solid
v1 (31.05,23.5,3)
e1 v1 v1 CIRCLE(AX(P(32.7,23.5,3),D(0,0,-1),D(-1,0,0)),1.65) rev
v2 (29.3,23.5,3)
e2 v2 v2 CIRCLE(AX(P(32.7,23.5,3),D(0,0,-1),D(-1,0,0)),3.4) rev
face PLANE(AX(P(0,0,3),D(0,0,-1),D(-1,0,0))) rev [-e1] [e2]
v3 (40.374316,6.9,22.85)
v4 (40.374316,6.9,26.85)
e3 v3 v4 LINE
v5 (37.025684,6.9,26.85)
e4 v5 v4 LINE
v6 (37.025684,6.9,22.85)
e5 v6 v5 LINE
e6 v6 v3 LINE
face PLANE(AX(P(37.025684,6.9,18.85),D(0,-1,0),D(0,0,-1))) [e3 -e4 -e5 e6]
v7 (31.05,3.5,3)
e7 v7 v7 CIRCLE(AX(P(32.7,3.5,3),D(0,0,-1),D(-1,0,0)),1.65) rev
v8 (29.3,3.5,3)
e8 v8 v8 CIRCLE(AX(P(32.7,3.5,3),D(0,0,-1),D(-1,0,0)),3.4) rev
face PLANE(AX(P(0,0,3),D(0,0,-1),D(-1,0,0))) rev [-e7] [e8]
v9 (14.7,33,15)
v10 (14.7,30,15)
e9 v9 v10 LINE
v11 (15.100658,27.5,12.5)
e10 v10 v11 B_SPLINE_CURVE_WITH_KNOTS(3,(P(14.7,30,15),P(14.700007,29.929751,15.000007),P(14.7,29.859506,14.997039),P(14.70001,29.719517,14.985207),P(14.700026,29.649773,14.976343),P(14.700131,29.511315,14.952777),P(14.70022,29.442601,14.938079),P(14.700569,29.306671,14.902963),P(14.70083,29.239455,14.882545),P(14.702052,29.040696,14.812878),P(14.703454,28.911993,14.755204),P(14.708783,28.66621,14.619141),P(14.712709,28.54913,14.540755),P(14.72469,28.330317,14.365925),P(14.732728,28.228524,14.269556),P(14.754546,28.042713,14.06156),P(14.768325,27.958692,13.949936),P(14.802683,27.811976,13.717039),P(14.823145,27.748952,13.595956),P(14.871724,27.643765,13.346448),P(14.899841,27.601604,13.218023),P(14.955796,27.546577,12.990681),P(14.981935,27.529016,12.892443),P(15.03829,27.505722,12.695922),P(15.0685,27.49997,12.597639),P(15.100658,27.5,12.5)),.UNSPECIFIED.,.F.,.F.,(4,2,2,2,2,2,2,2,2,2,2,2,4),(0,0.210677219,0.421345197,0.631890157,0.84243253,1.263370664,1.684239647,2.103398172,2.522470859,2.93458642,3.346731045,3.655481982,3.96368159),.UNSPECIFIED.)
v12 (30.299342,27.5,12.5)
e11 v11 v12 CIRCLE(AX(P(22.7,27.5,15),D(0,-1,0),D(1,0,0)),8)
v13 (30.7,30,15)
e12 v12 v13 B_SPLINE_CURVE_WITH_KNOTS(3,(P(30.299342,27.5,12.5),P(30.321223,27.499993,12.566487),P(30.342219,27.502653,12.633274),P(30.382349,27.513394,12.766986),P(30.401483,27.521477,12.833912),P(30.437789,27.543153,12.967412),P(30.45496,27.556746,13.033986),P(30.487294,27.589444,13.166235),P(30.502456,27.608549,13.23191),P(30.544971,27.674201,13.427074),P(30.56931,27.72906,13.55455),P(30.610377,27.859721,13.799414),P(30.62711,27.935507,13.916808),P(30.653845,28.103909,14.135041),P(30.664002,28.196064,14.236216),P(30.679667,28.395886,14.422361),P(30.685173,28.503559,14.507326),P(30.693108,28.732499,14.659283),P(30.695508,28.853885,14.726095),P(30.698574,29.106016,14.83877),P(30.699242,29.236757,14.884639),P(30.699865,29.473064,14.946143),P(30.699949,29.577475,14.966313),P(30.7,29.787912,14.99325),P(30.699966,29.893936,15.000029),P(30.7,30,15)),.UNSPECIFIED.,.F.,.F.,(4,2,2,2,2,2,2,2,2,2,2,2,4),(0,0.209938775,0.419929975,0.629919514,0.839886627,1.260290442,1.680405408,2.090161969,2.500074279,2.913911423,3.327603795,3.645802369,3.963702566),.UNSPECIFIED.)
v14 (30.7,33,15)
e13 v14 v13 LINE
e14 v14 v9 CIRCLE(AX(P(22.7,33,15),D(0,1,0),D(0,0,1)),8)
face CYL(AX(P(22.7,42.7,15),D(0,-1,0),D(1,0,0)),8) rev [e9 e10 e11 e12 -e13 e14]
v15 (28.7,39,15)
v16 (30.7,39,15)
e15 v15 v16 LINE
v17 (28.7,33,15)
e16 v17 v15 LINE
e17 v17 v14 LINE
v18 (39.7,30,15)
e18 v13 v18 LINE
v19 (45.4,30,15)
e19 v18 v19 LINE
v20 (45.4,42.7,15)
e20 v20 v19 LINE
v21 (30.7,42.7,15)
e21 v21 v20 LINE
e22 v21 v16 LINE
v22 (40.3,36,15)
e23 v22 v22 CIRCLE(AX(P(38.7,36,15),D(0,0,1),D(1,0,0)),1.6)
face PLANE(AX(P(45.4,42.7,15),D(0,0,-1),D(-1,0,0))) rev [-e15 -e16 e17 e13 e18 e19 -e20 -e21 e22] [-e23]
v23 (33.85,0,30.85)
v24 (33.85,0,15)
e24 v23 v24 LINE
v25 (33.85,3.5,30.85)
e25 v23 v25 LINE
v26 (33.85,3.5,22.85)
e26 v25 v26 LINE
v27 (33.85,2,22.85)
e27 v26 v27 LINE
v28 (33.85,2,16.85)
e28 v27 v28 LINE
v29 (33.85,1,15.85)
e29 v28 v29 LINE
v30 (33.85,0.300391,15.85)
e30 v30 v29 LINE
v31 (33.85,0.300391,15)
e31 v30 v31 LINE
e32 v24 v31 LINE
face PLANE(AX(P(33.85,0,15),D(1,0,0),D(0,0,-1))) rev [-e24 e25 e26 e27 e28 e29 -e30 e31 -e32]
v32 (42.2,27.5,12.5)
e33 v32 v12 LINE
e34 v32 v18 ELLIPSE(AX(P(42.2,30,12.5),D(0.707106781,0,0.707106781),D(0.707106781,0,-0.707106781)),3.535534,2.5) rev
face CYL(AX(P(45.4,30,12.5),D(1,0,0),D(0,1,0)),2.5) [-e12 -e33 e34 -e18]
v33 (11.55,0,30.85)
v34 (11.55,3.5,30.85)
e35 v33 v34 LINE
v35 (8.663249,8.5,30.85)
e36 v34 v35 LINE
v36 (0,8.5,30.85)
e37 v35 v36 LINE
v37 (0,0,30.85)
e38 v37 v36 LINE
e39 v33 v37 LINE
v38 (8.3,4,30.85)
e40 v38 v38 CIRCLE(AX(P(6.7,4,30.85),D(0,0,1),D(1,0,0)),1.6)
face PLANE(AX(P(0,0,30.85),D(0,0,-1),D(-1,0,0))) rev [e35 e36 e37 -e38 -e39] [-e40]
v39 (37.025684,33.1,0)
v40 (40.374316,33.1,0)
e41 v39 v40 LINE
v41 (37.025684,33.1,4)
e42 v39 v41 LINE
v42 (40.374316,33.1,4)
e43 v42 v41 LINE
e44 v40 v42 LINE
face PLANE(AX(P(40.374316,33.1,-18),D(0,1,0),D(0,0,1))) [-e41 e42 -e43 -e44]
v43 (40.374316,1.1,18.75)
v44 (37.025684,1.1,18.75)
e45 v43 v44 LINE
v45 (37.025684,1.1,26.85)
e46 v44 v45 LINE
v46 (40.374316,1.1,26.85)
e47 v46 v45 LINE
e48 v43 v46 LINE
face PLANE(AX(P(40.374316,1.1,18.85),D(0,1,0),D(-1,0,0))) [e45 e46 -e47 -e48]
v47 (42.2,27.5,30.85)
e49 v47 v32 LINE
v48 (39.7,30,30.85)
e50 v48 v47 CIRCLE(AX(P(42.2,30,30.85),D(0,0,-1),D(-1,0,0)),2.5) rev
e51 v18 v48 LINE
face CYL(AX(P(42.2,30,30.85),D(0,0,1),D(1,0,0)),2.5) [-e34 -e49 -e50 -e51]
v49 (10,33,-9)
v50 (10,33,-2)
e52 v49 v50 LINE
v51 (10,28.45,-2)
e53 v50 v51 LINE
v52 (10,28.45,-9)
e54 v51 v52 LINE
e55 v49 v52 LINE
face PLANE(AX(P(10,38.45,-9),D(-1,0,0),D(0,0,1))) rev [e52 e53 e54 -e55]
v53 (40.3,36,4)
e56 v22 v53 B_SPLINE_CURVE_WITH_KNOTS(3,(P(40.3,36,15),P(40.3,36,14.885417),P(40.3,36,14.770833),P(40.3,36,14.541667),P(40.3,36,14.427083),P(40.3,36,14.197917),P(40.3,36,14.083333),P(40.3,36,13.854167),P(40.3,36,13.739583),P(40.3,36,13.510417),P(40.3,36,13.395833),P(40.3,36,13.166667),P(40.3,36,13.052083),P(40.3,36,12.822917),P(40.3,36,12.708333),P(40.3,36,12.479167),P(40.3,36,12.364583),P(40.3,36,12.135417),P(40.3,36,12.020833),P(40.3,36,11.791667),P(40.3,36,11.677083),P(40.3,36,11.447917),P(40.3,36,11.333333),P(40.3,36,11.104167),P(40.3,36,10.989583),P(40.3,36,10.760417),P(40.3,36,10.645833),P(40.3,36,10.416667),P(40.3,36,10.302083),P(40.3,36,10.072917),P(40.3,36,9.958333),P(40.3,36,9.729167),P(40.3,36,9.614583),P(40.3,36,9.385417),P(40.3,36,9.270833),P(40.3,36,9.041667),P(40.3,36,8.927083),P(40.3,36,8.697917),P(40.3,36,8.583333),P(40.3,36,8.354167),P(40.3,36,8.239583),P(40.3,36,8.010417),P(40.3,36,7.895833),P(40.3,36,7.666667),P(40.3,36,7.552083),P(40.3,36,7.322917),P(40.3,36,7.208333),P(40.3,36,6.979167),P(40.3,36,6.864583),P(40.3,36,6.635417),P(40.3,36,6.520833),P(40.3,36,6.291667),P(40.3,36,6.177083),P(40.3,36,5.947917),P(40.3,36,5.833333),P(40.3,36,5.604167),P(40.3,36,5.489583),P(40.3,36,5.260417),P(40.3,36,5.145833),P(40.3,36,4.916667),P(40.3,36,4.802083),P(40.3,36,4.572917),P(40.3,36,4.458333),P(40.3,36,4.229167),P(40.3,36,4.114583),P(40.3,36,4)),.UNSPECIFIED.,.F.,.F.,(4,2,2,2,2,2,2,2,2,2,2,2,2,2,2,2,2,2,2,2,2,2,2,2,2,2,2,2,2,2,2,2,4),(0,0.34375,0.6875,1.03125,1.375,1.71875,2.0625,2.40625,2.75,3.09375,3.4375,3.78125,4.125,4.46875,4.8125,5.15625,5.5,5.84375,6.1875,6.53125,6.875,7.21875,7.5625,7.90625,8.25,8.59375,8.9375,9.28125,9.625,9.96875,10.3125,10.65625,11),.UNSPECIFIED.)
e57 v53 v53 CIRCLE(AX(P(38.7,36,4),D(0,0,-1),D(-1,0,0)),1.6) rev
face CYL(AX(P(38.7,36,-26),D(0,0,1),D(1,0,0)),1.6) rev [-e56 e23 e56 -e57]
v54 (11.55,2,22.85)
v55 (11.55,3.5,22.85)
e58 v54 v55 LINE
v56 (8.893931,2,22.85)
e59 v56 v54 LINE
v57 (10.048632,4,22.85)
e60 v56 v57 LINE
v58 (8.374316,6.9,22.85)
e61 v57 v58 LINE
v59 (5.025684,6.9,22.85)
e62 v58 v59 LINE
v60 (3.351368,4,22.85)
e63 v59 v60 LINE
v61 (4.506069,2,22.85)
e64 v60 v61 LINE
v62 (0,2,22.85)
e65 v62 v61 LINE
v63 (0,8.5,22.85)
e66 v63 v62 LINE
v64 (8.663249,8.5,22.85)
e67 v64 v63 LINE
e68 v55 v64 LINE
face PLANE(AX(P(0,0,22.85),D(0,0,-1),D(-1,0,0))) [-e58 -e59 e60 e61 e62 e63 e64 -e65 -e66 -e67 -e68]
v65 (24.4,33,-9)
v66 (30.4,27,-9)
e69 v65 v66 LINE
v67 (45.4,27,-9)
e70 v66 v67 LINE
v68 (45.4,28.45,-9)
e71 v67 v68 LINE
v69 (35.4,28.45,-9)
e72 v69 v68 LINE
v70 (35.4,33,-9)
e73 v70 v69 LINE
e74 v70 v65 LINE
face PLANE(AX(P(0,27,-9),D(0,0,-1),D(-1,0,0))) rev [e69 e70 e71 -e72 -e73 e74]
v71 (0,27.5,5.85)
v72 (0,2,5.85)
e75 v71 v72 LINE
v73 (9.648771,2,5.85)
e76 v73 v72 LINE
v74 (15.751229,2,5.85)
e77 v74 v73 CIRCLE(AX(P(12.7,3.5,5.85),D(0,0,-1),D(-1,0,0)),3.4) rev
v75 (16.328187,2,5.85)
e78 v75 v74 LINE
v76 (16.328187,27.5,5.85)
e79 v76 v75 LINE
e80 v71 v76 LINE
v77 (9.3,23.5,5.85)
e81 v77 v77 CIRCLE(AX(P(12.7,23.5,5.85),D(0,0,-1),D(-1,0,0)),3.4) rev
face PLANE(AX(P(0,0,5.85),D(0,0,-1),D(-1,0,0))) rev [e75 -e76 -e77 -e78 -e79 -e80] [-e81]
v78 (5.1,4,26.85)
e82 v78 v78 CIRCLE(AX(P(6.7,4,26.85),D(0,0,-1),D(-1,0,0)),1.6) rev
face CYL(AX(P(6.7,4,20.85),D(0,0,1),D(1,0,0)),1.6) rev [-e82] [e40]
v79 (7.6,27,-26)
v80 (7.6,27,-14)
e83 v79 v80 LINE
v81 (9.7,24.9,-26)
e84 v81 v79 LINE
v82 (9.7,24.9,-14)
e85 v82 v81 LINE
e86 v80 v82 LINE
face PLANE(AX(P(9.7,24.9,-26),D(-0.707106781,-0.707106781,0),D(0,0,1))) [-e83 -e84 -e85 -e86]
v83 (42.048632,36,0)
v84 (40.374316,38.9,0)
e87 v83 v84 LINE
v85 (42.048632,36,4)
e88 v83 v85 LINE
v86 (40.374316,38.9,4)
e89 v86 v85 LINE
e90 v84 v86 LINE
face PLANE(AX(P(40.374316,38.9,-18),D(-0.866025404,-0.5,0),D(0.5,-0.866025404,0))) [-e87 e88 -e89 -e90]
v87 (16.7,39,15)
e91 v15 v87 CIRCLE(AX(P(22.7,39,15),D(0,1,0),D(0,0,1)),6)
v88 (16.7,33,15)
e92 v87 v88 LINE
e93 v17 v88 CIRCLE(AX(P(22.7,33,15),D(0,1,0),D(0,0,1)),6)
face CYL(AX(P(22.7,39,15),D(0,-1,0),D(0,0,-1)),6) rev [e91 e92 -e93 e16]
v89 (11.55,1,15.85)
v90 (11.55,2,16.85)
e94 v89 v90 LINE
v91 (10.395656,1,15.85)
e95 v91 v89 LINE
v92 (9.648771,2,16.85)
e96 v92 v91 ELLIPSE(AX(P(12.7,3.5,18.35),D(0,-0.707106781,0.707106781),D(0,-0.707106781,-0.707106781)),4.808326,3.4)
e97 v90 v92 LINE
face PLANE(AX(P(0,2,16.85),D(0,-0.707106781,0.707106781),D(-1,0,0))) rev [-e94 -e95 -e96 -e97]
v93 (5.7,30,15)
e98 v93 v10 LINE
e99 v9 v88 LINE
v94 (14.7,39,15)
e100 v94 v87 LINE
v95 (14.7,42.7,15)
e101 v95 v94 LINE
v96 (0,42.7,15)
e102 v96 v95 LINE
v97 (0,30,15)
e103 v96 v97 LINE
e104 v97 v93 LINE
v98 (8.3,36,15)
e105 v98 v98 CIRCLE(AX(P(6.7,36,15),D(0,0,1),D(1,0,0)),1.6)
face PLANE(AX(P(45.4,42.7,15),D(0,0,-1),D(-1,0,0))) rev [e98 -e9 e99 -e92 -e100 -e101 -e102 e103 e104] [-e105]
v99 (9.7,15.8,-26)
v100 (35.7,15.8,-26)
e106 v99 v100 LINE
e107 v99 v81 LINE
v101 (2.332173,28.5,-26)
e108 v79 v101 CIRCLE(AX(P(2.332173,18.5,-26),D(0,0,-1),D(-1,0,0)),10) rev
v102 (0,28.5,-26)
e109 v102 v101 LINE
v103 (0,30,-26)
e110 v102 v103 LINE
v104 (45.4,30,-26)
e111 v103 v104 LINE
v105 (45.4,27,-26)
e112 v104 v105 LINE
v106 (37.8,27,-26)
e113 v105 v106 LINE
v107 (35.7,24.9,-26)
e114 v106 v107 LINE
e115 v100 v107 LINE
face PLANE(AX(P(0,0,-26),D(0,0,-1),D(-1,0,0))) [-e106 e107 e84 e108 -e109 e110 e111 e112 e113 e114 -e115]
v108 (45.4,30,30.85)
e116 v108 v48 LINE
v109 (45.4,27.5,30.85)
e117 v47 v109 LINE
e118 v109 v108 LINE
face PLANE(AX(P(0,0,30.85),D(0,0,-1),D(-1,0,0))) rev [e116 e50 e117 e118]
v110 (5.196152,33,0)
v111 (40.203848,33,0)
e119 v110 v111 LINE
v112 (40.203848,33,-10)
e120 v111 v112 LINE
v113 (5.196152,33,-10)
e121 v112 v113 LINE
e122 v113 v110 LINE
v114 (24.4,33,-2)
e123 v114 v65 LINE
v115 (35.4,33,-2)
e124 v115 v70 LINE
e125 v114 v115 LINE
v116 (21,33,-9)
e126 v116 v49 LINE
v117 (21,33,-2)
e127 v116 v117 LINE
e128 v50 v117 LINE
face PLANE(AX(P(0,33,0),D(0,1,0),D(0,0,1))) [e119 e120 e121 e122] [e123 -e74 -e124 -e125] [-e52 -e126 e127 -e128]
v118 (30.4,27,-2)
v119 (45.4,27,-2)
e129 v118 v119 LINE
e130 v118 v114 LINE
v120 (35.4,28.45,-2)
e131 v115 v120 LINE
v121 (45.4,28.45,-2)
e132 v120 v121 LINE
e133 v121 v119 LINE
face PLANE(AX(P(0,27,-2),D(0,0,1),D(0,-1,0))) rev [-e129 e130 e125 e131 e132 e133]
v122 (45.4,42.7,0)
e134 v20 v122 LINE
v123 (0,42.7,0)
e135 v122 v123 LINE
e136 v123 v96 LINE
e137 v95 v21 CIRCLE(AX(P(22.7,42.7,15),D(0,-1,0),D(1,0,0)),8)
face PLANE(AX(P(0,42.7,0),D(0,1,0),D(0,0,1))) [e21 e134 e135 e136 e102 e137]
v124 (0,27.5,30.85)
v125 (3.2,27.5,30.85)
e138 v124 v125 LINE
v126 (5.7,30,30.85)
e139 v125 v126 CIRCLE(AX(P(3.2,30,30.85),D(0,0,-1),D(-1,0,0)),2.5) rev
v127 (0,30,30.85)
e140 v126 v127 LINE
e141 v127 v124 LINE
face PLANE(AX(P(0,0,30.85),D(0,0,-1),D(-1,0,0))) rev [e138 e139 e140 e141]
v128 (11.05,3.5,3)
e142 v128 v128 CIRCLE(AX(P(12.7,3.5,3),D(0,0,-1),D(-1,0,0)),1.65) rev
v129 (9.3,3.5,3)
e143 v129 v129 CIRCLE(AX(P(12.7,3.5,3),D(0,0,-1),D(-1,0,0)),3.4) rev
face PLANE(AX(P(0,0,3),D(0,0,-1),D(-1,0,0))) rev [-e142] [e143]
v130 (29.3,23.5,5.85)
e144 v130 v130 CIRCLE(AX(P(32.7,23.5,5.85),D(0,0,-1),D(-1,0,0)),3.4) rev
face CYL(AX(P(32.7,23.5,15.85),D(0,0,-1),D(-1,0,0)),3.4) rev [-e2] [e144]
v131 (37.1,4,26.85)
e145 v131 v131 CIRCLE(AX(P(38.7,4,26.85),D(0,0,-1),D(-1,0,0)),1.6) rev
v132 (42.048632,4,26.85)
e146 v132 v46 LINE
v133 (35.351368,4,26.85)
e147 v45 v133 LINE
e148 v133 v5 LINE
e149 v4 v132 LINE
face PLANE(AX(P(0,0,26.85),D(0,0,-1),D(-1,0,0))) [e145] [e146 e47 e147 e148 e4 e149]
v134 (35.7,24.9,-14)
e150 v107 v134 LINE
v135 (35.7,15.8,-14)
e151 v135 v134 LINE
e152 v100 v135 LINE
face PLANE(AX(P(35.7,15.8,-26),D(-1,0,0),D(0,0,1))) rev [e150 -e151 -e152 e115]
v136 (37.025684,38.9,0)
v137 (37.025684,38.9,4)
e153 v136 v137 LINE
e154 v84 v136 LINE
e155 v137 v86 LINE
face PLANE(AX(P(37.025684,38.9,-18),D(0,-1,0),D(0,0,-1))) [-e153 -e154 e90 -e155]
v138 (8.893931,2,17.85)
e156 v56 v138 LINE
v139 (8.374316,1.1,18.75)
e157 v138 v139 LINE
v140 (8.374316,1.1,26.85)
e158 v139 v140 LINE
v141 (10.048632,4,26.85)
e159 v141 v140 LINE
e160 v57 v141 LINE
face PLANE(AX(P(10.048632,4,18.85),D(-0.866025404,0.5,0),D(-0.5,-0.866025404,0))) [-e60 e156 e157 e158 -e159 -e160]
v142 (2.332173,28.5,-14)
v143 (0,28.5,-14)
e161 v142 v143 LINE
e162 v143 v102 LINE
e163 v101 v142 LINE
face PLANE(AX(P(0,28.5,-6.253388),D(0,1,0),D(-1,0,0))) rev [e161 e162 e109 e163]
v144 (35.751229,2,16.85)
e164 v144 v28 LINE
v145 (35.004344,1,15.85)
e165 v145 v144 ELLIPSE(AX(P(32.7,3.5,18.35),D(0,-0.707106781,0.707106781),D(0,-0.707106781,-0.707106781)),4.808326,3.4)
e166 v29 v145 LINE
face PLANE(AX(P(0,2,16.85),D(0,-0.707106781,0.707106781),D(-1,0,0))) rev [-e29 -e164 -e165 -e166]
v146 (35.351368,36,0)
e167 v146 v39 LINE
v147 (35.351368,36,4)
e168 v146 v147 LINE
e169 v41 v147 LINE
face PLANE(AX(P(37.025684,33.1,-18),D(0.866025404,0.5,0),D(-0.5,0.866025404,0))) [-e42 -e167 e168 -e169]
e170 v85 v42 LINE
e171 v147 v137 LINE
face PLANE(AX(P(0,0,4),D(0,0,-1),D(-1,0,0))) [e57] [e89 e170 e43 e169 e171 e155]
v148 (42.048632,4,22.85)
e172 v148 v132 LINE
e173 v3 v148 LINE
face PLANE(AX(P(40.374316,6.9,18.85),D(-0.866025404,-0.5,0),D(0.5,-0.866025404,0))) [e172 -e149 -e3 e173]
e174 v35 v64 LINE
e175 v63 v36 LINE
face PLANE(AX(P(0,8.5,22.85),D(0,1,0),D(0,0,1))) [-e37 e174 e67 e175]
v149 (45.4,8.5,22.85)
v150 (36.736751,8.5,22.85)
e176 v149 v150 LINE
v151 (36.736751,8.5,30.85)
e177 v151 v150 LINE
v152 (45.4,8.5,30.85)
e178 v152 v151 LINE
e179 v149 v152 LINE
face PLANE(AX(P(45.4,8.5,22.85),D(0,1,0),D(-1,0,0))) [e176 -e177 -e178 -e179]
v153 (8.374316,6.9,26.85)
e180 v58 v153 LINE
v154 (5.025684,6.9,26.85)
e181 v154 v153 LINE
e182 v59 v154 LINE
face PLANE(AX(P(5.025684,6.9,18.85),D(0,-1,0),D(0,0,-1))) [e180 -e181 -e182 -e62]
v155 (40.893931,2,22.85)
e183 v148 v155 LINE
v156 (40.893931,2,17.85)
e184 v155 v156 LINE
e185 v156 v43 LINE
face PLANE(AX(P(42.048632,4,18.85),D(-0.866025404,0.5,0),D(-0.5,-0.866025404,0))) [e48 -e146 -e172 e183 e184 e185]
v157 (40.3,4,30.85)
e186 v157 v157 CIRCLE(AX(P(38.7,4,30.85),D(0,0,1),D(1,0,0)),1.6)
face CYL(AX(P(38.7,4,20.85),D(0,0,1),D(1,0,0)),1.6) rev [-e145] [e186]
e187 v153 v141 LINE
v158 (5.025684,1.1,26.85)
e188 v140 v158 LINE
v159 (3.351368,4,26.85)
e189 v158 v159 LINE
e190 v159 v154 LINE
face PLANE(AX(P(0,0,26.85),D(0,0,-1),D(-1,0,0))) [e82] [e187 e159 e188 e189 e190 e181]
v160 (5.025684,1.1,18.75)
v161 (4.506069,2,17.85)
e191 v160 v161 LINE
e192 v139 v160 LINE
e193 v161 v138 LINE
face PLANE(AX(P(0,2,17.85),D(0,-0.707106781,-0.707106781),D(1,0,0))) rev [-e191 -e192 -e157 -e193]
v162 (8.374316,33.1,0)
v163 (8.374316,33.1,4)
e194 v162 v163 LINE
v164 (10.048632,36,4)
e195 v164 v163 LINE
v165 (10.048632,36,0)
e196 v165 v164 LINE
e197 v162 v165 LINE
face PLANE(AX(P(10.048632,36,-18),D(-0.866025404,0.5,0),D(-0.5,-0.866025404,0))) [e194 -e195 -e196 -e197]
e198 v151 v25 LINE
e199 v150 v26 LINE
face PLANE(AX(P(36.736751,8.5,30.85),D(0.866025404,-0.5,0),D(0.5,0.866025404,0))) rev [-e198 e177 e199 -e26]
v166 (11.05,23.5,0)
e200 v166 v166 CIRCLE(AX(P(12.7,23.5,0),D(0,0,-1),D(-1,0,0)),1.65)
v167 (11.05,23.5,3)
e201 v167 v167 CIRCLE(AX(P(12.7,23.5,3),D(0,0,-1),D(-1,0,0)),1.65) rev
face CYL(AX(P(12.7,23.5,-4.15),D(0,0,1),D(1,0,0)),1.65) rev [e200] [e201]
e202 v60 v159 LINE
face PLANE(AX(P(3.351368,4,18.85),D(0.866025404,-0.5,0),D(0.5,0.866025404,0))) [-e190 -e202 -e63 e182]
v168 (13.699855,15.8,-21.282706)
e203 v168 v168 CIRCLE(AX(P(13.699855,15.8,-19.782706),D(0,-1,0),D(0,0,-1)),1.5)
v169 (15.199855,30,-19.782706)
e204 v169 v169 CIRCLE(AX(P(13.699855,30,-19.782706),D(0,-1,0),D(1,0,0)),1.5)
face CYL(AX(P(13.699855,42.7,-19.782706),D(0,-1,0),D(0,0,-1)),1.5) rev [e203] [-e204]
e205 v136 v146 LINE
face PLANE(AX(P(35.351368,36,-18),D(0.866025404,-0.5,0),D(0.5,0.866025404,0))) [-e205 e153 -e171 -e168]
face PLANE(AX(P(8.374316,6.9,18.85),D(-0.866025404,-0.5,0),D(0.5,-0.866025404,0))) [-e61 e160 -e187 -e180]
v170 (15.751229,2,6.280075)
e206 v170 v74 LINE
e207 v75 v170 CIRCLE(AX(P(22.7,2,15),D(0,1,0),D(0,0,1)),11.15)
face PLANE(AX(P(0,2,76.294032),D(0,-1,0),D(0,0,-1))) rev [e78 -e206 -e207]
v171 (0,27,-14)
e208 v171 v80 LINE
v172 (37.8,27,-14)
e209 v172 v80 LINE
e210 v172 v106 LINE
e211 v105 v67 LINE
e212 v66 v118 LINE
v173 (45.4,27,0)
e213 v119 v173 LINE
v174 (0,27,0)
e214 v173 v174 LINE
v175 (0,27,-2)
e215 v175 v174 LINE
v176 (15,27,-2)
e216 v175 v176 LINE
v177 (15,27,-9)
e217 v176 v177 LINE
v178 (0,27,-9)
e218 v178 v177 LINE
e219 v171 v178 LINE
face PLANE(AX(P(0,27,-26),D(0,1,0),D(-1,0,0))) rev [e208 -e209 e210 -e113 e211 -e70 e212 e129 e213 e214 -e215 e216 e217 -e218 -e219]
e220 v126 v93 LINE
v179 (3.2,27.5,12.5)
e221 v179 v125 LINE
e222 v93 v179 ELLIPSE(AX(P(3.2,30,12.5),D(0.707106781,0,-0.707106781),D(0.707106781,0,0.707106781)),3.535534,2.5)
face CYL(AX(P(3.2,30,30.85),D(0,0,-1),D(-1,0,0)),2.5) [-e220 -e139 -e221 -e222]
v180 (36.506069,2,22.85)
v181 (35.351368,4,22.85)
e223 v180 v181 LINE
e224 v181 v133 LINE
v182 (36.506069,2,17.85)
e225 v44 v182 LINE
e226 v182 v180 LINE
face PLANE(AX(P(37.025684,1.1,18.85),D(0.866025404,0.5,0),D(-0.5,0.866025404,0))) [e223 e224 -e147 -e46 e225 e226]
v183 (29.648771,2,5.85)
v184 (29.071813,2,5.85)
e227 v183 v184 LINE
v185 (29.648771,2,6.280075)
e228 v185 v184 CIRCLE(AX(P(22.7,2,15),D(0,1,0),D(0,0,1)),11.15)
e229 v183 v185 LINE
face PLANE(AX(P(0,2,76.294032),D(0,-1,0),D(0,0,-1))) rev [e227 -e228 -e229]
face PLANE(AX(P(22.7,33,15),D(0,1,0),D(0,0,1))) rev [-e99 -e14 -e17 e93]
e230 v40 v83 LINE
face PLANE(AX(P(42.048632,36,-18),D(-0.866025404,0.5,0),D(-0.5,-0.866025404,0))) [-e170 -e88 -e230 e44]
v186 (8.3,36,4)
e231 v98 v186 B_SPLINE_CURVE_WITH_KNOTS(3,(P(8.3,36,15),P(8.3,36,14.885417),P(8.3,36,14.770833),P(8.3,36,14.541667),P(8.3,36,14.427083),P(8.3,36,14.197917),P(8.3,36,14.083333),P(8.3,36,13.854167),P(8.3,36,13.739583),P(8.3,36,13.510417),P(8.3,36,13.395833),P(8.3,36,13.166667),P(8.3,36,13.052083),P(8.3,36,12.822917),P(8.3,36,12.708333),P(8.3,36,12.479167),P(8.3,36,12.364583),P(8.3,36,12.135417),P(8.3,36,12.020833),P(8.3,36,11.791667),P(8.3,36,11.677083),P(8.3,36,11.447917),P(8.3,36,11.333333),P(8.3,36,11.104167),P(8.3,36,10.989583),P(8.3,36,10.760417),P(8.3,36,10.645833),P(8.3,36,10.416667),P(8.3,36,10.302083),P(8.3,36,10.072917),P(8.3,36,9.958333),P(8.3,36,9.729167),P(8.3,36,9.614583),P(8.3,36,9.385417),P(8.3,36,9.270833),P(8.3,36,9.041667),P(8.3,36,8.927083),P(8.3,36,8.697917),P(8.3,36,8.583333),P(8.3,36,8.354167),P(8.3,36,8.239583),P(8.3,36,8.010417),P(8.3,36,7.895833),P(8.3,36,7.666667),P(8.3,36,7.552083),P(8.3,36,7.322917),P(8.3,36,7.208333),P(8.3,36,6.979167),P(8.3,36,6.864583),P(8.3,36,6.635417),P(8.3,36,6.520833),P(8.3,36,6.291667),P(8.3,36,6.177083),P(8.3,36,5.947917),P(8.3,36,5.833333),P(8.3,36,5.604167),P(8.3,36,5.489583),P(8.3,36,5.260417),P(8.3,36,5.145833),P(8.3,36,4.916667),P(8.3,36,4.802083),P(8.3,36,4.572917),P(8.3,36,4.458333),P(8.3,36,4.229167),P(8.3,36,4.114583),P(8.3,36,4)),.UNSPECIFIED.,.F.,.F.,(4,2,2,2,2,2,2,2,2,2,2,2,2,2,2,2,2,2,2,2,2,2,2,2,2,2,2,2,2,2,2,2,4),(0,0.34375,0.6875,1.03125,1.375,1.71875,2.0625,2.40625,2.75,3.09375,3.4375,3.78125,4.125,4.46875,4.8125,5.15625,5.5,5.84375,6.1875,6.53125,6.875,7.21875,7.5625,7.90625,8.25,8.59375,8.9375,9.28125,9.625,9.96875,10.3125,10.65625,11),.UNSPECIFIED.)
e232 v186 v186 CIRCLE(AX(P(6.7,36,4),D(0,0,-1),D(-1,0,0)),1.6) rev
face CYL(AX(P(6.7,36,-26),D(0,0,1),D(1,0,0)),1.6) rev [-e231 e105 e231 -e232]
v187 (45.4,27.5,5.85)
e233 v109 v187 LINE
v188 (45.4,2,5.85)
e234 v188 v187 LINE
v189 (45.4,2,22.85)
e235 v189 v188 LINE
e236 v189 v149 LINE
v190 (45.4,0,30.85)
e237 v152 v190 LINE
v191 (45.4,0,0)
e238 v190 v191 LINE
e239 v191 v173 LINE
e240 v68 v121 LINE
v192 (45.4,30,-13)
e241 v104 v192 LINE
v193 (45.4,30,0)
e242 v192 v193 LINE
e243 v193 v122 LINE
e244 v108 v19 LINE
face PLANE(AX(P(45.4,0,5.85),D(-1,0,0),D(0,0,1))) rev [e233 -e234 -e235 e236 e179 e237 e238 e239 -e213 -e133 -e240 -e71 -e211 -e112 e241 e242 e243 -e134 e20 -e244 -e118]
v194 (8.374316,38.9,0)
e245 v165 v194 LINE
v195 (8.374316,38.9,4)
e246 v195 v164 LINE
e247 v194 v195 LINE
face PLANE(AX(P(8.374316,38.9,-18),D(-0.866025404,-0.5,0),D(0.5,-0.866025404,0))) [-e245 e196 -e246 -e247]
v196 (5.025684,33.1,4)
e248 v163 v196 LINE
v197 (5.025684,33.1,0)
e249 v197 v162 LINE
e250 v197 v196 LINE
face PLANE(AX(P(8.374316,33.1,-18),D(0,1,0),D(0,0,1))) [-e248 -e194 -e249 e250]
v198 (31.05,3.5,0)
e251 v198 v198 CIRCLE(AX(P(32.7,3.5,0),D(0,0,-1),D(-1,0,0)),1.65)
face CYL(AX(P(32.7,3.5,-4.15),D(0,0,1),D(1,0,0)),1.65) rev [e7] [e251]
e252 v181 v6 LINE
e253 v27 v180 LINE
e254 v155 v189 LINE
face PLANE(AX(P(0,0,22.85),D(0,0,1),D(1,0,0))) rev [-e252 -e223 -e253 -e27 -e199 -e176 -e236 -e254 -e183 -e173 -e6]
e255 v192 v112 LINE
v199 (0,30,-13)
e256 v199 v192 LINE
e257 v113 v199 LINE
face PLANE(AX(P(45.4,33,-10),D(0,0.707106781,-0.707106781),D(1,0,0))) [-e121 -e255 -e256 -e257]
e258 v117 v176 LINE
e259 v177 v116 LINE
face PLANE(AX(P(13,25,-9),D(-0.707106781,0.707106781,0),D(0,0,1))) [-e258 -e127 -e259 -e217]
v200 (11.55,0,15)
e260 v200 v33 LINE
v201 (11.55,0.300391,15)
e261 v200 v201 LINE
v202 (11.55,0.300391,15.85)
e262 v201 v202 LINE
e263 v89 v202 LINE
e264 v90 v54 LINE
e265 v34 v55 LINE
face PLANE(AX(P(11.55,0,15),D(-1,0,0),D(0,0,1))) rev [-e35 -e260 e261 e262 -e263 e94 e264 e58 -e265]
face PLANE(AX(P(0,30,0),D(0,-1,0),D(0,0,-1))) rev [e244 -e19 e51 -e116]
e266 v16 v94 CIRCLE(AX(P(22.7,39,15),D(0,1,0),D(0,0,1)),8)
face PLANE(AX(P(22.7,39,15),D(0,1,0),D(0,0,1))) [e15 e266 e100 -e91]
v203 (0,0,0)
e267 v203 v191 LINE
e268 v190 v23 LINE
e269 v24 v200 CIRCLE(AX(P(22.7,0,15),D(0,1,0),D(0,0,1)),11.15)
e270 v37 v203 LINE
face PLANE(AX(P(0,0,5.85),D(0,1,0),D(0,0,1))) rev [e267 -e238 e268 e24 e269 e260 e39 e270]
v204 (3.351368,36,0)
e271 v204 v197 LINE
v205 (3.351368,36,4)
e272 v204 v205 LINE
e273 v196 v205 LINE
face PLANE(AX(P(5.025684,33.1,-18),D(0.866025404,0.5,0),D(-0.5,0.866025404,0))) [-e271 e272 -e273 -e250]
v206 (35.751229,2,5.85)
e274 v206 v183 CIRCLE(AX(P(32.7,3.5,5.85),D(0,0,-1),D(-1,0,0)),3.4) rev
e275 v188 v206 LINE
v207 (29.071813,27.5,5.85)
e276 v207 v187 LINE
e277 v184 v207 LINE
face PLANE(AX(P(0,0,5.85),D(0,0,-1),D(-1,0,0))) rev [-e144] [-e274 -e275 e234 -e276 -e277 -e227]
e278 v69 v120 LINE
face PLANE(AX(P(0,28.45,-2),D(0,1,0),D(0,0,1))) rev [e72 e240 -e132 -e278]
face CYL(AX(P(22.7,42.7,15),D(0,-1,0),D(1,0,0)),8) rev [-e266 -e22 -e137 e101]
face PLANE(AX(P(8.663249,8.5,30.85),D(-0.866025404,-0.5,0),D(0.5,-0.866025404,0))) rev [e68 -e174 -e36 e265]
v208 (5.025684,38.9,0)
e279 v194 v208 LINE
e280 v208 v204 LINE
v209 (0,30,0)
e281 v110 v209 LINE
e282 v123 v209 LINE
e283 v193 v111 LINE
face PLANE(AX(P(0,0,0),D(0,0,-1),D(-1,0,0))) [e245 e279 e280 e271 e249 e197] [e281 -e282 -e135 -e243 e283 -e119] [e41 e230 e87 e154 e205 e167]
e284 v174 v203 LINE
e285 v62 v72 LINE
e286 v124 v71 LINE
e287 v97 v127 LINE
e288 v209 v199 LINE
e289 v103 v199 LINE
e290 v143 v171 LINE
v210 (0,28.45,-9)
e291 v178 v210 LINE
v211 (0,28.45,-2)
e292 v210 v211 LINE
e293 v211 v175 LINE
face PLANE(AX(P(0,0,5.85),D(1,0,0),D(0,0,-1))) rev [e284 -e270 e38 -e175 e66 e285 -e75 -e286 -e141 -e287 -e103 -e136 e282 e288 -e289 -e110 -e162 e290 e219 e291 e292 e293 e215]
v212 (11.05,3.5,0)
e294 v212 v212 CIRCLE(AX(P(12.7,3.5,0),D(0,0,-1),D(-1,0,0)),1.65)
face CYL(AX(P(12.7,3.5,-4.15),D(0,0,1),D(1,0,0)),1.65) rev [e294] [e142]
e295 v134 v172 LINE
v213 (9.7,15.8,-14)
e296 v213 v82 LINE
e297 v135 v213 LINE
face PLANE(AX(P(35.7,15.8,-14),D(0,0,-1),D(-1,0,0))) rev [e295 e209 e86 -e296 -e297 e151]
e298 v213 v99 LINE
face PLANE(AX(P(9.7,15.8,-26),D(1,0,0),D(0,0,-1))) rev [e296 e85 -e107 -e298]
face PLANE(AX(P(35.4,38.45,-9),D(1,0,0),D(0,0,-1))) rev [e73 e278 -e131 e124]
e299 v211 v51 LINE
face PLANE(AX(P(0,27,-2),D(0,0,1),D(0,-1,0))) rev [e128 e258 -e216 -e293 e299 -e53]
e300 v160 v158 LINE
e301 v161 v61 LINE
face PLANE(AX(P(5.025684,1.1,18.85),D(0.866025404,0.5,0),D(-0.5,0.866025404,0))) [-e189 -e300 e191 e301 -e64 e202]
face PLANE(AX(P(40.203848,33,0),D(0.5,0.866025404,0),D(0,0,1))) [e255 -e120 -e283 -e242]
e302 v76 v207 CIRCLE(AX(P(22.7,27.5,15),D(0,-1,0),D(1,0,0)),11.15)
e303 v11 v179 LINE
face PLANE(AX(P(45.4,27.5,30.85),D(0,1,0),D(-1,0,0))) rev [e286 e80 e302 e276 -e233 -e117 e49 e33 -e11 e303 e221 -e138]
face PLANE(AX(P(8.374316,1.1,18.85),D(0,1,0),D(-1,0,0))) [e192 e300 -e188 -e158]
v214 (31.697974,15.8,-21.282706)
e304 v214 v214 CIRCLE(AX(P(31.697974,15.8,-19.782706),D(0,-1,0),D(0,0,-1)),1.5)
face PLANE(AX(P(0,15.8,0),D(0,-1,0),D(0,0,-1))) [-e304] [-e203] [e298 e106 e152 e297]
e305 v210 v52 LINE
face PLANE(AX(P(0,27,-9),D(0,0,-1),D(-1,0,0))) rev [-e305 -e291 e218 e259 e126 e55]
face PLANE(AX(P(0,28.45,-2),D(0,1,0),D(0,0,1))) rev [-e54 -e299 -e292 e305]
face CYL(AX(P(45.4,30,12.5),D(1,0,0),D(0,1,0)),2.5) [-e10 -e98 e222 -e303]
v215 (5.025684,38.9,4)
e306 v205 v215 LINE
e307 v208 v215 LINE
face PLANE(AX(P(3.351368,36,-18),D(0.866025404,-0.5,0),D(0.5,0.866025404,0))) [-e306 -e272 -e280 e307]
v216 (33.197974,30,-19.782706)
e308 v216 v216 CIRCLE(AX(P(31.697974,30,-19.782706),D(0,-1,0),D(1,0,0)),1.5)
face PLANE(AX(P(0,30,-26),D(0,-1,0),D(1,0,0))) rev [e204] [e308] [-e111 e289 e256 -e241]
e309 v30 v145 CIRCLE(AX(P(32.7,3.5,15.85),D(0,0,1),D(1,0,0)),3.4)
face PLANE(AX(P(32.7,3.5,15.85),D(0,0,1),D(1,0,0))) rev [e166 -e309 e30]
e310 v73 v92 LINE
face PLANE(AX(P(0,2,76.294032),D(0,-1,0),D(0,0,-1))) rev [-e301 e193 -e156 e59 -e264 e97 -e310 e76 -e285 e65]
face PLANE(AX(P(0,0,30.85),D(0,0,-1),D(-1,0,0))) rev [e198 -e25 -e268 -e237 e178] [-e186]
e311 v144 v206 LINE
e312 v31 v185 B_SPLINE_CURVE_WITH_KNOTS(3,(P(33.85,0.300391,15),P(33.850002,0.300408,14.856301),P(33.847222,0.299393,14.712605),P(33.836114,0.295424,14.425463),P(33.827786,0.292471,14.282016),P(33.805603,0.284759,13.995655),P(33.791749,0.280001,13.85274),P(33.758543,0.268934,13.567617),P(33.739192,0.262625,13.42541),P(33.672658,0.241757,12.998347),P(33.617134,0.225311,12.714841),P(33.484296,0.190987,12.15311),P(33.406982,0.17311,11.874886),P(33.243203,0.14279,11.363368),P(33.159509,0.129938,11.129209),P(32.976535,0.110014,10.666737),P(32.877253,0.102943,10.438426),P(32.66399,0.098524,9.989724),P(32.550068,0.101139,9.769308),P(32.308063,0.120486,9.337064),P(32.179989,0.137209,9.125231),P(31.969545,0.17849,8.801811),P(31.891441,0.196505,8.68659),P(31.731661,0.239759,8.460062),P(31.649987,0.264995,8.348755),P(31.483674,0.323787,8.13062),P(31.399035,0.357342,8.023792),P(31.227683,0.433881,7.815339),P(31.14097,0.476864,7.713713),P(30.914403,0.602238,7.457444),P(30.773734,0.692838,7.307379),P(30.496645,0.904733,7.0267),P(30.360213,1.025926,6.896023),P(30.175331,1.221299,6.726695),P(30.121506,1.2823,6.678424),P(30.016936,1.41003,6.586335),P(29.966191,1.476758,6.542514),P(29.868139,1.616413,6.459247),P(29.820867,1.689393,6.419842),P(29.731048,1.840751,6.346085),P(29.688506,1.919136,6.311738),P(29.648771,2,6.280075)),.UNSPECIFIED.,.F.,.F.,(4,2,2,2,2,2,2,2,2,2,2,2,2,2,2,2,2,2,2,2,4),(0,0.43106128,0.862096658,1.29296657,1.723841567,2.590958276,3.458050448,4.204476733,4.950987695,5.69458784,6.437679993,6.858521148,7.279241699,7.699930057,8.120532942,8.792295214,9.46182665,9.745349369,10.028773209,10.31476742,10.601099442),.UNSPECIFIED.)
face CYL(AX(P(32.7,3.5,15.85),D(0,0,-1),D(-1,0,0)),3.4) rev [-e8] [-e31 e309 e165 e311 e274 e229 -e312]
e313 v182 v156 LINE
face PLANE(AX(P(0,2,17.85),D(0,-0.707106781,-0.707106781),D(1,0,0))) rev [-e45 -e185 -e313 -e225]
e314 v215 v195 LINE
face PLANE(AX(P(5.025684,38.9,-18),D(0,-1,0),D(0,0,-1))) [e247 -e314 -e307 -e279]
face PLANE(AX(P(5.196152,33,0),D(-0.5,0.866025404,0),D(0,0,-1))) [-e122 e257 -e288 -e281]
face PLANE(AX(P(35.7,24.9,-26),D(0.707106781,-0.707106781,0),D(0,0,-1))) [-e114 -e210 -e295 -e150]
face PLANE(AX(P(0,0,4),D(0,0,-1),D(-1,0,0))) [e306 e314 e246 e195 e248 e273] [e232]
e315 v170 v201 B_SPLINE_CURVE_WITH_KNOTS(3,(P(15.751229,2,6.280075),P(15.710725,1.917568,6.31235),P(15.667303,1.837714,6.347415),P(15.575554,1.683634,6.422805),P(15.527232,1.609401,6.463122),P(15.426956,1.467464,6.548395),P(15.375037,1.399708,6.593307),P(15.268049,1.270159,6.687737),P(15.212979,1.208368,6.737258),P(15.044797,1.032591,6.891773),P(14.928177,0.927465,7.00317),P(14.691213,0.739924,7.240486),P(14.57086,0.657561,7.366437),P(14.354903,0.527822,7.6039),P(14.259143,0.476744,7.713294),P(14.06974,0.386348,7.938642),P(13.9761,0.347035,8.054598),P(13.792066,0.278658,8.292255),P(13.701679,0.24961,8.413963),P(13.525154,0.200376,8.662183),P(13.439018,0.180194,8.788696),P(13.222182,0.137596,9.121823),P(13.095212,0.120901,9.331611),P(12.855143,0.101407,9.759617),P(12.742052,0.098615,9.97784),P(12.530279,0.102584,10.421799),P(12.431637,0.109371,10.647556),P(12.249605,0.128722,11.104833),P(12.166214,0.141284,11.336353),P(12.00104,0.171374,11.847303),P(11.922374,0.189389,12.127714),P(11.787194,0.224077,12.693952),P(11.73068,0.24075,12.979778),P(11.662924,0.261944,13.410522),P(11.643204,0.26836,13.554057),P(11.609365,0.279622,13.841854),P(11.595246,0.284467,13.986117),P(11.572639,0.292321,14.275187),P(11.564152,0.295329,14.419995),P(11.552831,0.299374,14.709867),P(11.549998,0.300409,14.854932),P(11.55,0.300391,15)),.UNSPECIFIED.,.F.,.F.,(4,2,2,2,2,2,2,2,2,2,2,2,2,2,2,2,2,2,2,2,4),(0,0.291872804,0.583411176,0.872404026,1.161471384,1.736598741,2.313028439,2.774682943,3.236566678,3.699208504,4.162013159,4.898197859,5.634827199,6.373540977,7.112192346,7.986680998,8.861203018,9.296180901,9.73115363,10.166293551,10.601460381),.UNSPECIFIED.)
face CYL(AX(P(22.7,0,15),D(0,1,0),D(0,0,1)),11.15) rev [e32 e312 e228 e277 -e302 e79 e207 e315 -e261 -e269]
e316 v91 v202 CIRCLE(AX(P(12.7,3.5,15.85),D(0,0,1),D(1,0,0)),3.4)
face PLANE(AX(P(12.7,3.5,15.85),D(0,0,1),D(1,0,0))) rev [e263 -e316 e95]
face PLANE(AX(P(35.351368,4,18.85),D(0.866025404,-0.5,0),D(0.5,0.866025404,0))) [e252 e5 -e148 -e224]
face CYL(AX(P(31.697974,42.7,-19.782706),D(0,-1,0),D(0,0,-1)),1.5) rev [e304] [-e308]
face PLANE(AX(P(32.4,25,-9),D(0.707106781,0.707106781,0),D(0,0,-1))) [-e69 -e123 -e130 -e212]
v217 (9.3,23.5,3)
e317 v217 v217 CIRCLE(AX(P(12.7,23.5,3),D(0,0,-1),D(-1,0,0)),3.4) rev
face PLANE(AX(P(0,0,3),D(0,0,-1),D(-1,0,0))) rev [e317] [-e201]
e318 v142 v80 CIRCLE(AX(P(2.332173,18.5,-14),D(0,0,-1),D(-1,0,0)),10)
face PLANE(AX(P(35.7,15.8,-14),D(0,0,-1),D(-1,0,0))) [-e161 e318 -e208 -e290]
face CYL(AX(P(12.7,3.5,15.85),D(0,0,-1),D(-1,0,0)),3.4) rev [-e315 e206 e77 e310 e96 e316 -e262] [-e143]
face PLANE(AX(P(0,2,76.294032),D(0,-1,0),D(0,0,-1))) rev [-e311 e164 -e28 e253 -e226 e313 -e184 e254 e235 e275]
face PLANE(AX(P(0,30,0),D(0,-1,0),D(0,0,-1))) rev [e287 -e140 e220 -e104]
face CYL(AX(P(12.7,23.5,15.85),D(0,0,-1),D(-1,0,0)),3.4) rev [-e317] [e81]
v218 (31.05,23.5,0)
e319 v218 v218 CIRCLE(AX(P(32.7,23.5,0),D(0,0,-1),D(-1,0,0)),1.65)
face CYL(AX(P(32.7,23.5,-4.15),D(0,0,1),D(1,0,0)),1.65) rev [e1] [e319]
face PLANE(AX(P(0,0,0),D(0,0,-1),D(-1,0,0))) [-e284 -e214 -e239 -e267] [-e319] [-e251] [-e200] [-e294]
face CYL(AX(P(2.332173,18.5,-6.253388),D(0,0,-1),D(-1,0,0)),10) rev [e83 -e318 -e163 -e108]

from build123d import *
from OCP.BRepFilletAPI import BRepFilletAPI_MakeChamfer

# Parameters (mm, degrees)
SKETCH1_W                = 45.4
SKETCH1_H                = 27
BOSS_EXTRUDE1_DEPTH      = 5.85
SKETCH3_W                = 45.4
SKETCH3_H                = 5.85
BOSS_EXTRUDE2_DEPTH      = 3
SKETCH4_W                = 45.4
SKETCH4_H                = 2.5
BOSS_EXTRUDE3_DEPTH      = 25
SKETCH6_W                = 45.4
SKETCH6_H                = 2
BOSS_EXTRUDE5_DEPTH      = 25
SKETCH7_R                = 1.65
CUT_EXTRUDE1_DEPTH       = 10
CUT_EXTRUDE2_DEPTH       = 10
CUT_EXTRUDE2_DEPTH_BACK  = 2.85
SKETCH8_R                = 3.4
SKETCH37_W               = 45.4
SKETCH37_H               = 15
BOSS_EXTRUDE16_DEPTH     = 12.7
CUT_EXTRUDE3_DEPTH       = 69.332806909
CUT_EXTRUDE4_DEPTH       = 62.393261076
SKETCH18_W               = 45.4
SKETCH18_H               = 3
BOSS_EXTRUDE8_DEPTH      = 26
SKETCH19_W               = 26
SKETCH19_H               = 12
BOSS_EXTRUDE9_DEPTH      = 11.2
SKETCH20_R               = 1.5
CUT_EXTRUDE9_DEPTH       = 62.1268558
SKETCH21_W               = 45.4
SKETCH21_H               = 10
BOSS_EXTRUDE10_DEPTH     = 3
SKETCH22_W               = 7
SKETCH22_H               = 1.45
CUT_EXTRUDE10_DEPTH      = 70.542594861
SKETCH23_W               = 3
SKETCH23_H               = 7
CUT_EXTRUDE11_DEPTH      = 10
SKETCH24_W               = 19.4
SKETCH24_H               = 7
BOSS_EXTRUDE11_DEPTH     = 1.45
CHAMFER2_SIZE            = 3
CHAMFER2_SIZE2           = 5.196152423
CHAMFER3_SIZE            = 3
CHAMFER4_SIZE            = 2.1
SKETCH35_W               = 7.6
SKETCH35_H               = 1.5
CUT_EXTRUDE14_DEPTH      = 12
FILLET8_R                = 10
SKETCH36_R               = 11.15
CUT_EXTRUDE15_DEPTH      = 25.5
SKETCH39_R               = 8
SKETCH39_R_2             = 6
BOSS_EXTRUDE17_DEPTH     = 6
SKETCH40_W               = 45.4
SKETCH40_H               = 10
CUT_EXTRUDE16_DEPTH      = 63.553037544
SKETCH41_R               = 1.6
CUT_EXTRUDE17_DEPTH      = 75.601943674
CUT_EXTRUDE18_DEPTH      = 18
CUT_EXTRUDE18_DEPTH_BACK = 4
SKETCH43_W               = 11.55
SKETCH43_H               = 6.5
BOSS_EXTRUDE18_DEPTH     = 8
SKETCH44_R               = 1.6
CUT_EXTRUDE19_DEPTH      = 10
CUT_EXTRUDE20_DEPTH      = 4
CUT_EXTRUDE20_DEPTH_BACK = 4
CUT_EXTRUDE21_DEPTH      = 80.18820935
SKETCH47_W               = 9
SKETCH47_H               = 15.85
CUT_EXTRUDE22_DEPTH      = 4
FILLET11_R               = 2.5
CHAMFER7_SIZE            = 1


# Some blends are built 0.0001 mm under size
with BuildPart() as part:
    # Sketch1 → Boss-Extrude1 (new body)
    with BuildSketch(Plane.XY):
        with Locations((22.7, 13.5)):
            Rectangle(SKETCH1_W, SKETCH1_H)
    extrude(amount=BOSS_EXTRUDE1_DEPTH)

    # Sketch3 → Boss-Extrude2 (add)
    with BuildSketch(Plane(origin=(0, 27, 0), x_dir=(1, 0, 0), z_dir=(0, 1, 0))):
        with Locations((22.7, -2.925)):
            Rectangle(SKETCH3_W, SKETCH3_H)
    extrude(amount=BOSS_EXTRUDE2_DEPTH)

    # Sketch4 → Boss-Extrude3 (add)
    with BuildSketch(Plane.XY.offset(5.85)):
        with Locations((22.7, 28.75)):
            Rectangle(SKETCH4_W, SKETCH4_H)
    extrude(amount=BOSS_EXTRUDE3_DEPTH)

    # Sketch6 → Boss-Extrude5 (add)
    with BuildSketch(Plane.XY.offset(5.85)):
        with Locations((22.7, 1)):
            Rectangle(SKETCH6_W, SKETCH6_H)
    extrude(amount=BOSS_EXTRUDE5_DEPTH)

    # Sketch7 → Cut-Extrude1 (cut)
    with BuildSketch(Plane.XY.offset(5.85)):
        with Locations((12.7, 23.5)):
            Circle(SKETCH7_R)
        with Locations((32.7, 23.5)):
            Circle(SKETCH7_R)
        with Locations(Location((32.7, 3.5, 0), (0, 0, 294.619977329))):
            Circle(SKETCH7_R)
        with Locations(Location((12.7, 3.5, 0), (0, 0, 294.619977329))):
            Circle(SKETCH7_R)
    extrude(amount=-CUT_EXTRUDE1_DEPTH, mode=Mode.SUBTRACT)

    # Sketch8 → Cut-Extrude2 (cut, two sides: drawn at the far end of the back side and taken through both)
    with BuildSketch(Plane.XY.offset(5.85).offset(-CUT_EXTRUDE2_DEPTH_BACK)):
        with Locations(Location((12.7, 23.5, 0), (0, 0, 180))):
            Circle(SKETCH8_R)
        with Locations(Location((32.7, 23.5, 0), (0, 0, 180))):
            Circle(SKETCH8_R)
        with Locations(Location((32.7, 3.5, 0), (0, 0, 180))):
            Circle(SKETCH8_R)
        with Locations(Location((12.7, 3.5, 0), (0, 0, 180))):
            Circle(SKETCH8_R)
    extrude(amount=CUT_EXTRUDE2_DEPTH + CUT_EXTRUDE2_DEPTH_BACK, mode=Mode.SUBTRACT)

    # Sketch37 → Boss-Extrude16 (add)
    with BuildSketch(Plane(origin=(0, 30, 0), x_dir=(1, 0, 0), z_dir=(0, 1, 0))):
        with Locations((22.7, -7.5)):
            Rectangle(SKETCH37_W, SKETCH37_H)
    extrude(amount=BOSS_EXTRUDE16_DEPTH)

    # Sketch9 → Cut-Extrude3 (cut, through all)
    with BuildSketch(Plane(origin=(0, 2, 0), x_dir=(1, 0, 0), z_dir=(0, 1, 0))):
        with BuildLine():
            Line((11.55, -15), (11.55, -30.85))
            Line((11.55, -30.85), (33.85, -30.85))
            Line((33.85, -30.85), (33.85, -15))
            ThreePointArc((33.85, -15), (22.7, -3.85), (11.55, -15))
        make_face()
    extrude(amount=-CUT_EXTRUDE3_DEPTH, mode=Mode.SUBTRACT)

    # Sketch10 → Cut-Extrude4 (cut, through all)
    with BuildSketch(Plane.XZ.offset(-27.5)):
        with BuildLine():
            Line((14.7, 15), (14.7, 30.85))
            Line((14.7, 30.85), (30.7, 30.85))
            Line((30.7, 30.85), (30.7, 15))
            ThreePointArc((30.7, 15), (22.7, 7), (14.7, 15))
        make_face()
    extrude(amount=-CUT_EXTRUDE4_DEPTH, mode=Mode.SUBTRACT)

    # Sketch18 → Boss-Extrude8 (add)
    with BuildSketch(Plane(origin=(0, 0, 0), x_dir=(-1, 0, 0), z_dir=(0, 0, -1))):
        with Locations((-22.7, 28.5)):
            Rectangle(SKETCH18_W, SKETCH18_H)
    extrude(amount=BOSS_EXTRUDE8_DEPTH)

    # Sketch19 → Boss-Extrude9 (add)
    with BuildSketch(Plane.XZ.offset(-27)):
        with Locations((22.7, -20)):
            Rectangle(SKETCH19_W, SKETCH19_H)
    extrude(amount=BOSS_EXTRUDE9_DEPTH)

    # Sketch20 → Cut-Extrude9 (cut, through all)
    with BuildSketch(Plane.XZ.offset(-15.8)):
        with Locations(Location((31.697973531, -19.782705683, 0), (0, 0, 270))):
            Circle(SKETCH20_R)
        with Locations(Location((13.699854881, -19.782705683, 0), (0, 0, 270))):
            Circle(SKETCH20_R)
    extrude(amount=-CUT_EXTRUDE9_DEPTH, mode=Mode.SUBTRACT)

    # Sketch21 → Boss-Extrude10 (add)
    with BuildSketch(Plane(origin=(0, 30, 0), x_dir=(1, 0, 0), z_dir=(0, 1, 0))):
        with Locations((22.7, 5)):
            Rectangle(SKETCH21_W, SKETCH21_H)
    extrude(amount=BOSS_EXTRUDE10_DEPTH)

    # Sketch22 → Cut-Extrude10 (cut, through all)
    with BuildSketch(Plane(origin=(45.4, 0, 0), x_dir=(0, 0, -1), z_dir=(1, 0, 0))):
        with Locations((5.5, 27.725)):
            Rectangle(SKETCH22_W, SKETCH22_H)
    extrude(amount=-CUT_EXTRUDE10_DEPTH, mode=Mode.SUBTRACT)

    # Sketch23 → Cut-Extrude11 (cut)
    with BuildSketch(Plane.XZ.offset(-28.45)):
        with Locations((11.5, -5.5)):
            Rectangle(SKETCH23_W, SKETCH23_H)
        with Locations((33.9, -5.5)):
            Rectangle(SKETCH23_W, SKETCH23_H)
    extrude(amount=-CUT_EXTRUDE11_DEPTH, mode=Mode.SUBTRACT)

    # Sketch24 → Boss-Extrude11 (add)
    with BuildSketch(Plane.XZ.offset(-28.45)):
        with Locations((22.7, -5.5)):
            Rectangle(SKETCH24_W, SKETCH24_H)
    extrude(amount=BOSS_EXTRUDE11_DEPTH)

    # Chamfer1
    # the kernel refuses this chamfer: 8 mm, written as the material it takes off along each edge
    with BuildSketch(Plane(origin=(32.4, 33, -2), x_dir=(-1, 0, 0), z_dir=(0, 0, -1)), Plane(origin=(13, 33, -9), x_dir=(1, 0, 0), z_dir=(0, 0, 1))) as chamfer1_piece_1:
        with BuildLine():
            Line((8.22627417, 0.22627417), (-0.22627417, -8.22627417))
            Line((-0.22627417, -8.22627417), (-0.38627417, -8.22627417))
            ThreePointArc((-0.38627417, -8.22627417), (-0.16, -4.113137085), (-0.16, 0))
            Line((-0.16, 0), (0, 0.16))
            ThreePointArc((0, 0.16), (4.113137085, 0.16), (8.22627417, 0.38627417))
            Line((8.22627417, 0.38627417), (8.22627417, 0.22627417))
        make_face()
    extrude(amount=7, mode=Mode.SUBTRACT)

    # Chamfer2: one chamfer whose edges measure the first distance from different faces: ONE call of the kernel's chamfer builder (chamfer() names one face for all edges)
    chamfer2_edges_1 = [part.edges().sort_by_distance(p)[0] for p in [
        (45.4, 33, -5),
    ]]
    chamfer2_side_1 = [part.faces().sort_by_distance(p)[0] for p in [
        (45.4, 24.795074607, 5.028693502),
    ]]
    chamfer2_edges_2 = [part.edges().sort_by_distance(p)[0] for p in [
        (0, 33, -5),
    ]]
    chamfer2_side_2 = [part.faces().sort_by_distance(p)[0] for p in [
        (0, 24.795074607, 5.028693502),
    ]]
    chamfer2 = BRepFilletAPI_MakeChamfer(part.part.solid().wrapped)
    for e in chamfer2_edges_1:
        chamfer2.Add(CHAMFER2_SIZE, CHAMFER2_SIZE2, e.wrapped, chamfer2_side_1[0].wrapped)  # the first distance lies on this face
    for e in chamfer2_edges_2:
        chamfer2.Add(CHAMFER2_SIZE, CHAMFER2_SIZE2, e.wrapped, chamfer2_side_2[0].wrapped)  # the first distance lies on this face
    add(Compound.cast(chamfer2.Shape()), mode=Mode.REPLACE)

    # Chamfer3
    chamfer3_edges = [part.edges().sort_by_distance(p)[0] for p in [
        (22.7, 30, -10),
    ]]
    chamfer(chamfer3_edges, length=CHAMFER3_SIZE - 0.0001)  # a hair under: the kernel refuses the full size

    # Chamfer4
    chamfer4_edges = [part.edges().sort_by_distance(p)[0] for p in [
        (35.7, 27, -20),
        (9.7, 27, -20),
    ]]
    chamfer(chamfer4_edges, length=CHAMFER4_SIZE)

    # Sketch35 → Cut-Extrude14 (cut)
    with BuildSketch(Plane(origin=(0, 0, -26), x_dir=(-1, 0, 0), z_dir=(0, 0, -1))):
        with Locations((-3.8, 27.75)):
            Rectangle(SKETCH35_W, SKETCH35_H)
    extrude(amount=-CUT_EXTRUDE14_DEPTH, mode=Mode.SUBTRACT)

    # Fillet8
    # the kernel refuses this fillet: 10 mm, written as the material it adds along each edge
    with BuildSketch(Plane(origin=(7.6, 28.5, -26), x_dir=(-1, 0, 0), z_dir=(0, 0, 1))) as fillet8_piece_1:
        with BuildLine():
            CenterArc((5.267826876, 10), FILLET8_R, 238.211669383, 31.788330617)
            Line((0, 1.5), (0, 0))
            Line((0, 0), (5.267826876, 0))
        make_face()
    extrude(amount=12)

    # Sketch36 → Cut-Extrude15 (cut)
    with BuildSketch(Plane.XZ.offset(-27.5)):
        with Locations((22.7, 15)):
            Circle(SKETCH36_R)
    extrude(amount=CUT_EXTRUDE15_DEPTH, mode=Mode.SUBTRACT)

    # Sketch39 → Boss-Extrude17 (add)
    with BuildSketch(Plane(origin=(0, 33, 0), x_dir=(1, 0, 0), z_dir=(0, 1, 0))):
        with Locations((22.7, -15)):
            Circle(SKETCH39_R)
        with Locations(Location((22.7, -15, 0), (0, 0, 270))):
            Circle(SKETCH39_R_2, mode=Mode.SUBTRACT)
    extrude(amount=BOSS_EXTRUDE17_DEPTH)

    # Sketch40 → Cut-Extrude16 (cut, through all)
    with BuildSketch(Plane(origin=(0, 30, 0), x_dir=(1, 0, 0), z_dir=(0, 1, 0))):
        with Locations((22.7, -20)):
            Rectangle(SKETCH40_W, SKETCH40_H)
    extrude(amount=CUT_EXTRUDE16_DEPTH, mode=Mode.SUBTRACT)

    # Sketch41 → Cut-Extrude17 (cut, through all)
    with BuildSketch(Plane.XY.offset(15)):
        with Locations((6.7, 36)):
            Circle(SKETCH41_R)
        with Locations((38.7, 36)):
            Circle(SKETCH41_R)
    extrude(amount=-CUT_EXTRUDE17_DEPTH, mode=Mode.SUBTRACT)

    # Sketch42 → Cut-Extrude18 (cut, two sides: drawn at the far end of the back side and taken through both)
    with BuildSketch(Plane(origin=(0, 0, 0), x_dir=(-1, 0, 0), z_dir=(0, 0, -1)).offset(-CUT_EXTRUDE18_DEPTH_BACK)):
        Polygon((-40.374315781, 38.9), (-42.048631561, 36), (-40.374315781, 33.1), (-37.025684219, 33.1), (-35.351368439, 36), (-37.025684219, 38.9), align=None)
        Polygon((-8.374315781, 38.9), (-10.048631561, 36), (-8.374315781, 33.1), (-5.025684219, 33.1), (-3.351368439, 36), (-5.025684219, 38.9), align=None)
    extrude(amount=CUT_EXTRUDE18_DEPTH + CUT_EXTRUDE18_DEPTH_BACK, mode=Mode.SUBTRACT)

    # Sketch43 → Boss-Extrude18 (add)
    with BuildSketch(Plane.XY.offset(30.85)):
        with Locations((5.775, 5.25)):
            Rectangle(SKETCH43_W, SKETCH43_H)
        with Locations((39.625, 5.25)):
            Rectangle(SKETCH43_W, SKETCH43_H)
    extrude(amount=-BOSS_EXTRUDE18_DEPTH)

    # Sketch44 → Cut-Extrude19 (cut)
    with BuildSketch(Plane.XY.offset(30.85)):
        with Locations((6.7, 4)):
            Circle(SKETCH44_R)
        with Locations((38.7, 4)):
            Circle(SKETCH44_R)
    extrude(amount=-CUT_EXTRUDE19_DEPTH, mode=Mode.SUBTRACT)

    # Sketch45 → Cut-Extrude20 (cut, two sides: drawn at the far end of the back side and taken through both)
    with BuildSketch(Plane(origin=(0, 0, 22.85), x_dir=(-1, 0, 0), z_dir=(0, 0, -1)).offset(-CUT_EXTRUDE20_DEPTH_BACK)):
        Polygon((-40.374315781, 6.9), (-42.048631561, 4), (-40.374315781, 1.1), (-37.025684219, 1.1), (-35.351368439, 4), (-37.025684219, 6.9), align=None)
        Polygon((-8.374315781, 6.9), (-10.048631561, 4), (-8.374315781, 1.1), (-5.025684219, 1.1), (-3.351368439, 4), (-5.025684219, 6.9), align=None)
    extrude(amount=CUT_EXTRUDE20_DEPTH + CUT_EXTRUDE20_DEPTH_BACK, mode=Mode.SUBTRACT)

    # Sketch46 → Cut-Extrude21 (cut, through all)
    with BuildSketch(Plane(origin=(0, 0, 22.85), x_dir=(-1, 0, 0), z_dir=(0, 0, -1))):
        Polygon((-36.736751346, 8.5), (-33.85, 3.5), (-33.85, 8.5), align=None)
        Polygon((-11.55, 8.5), (-8.663248654, 8.5), (-11.55, 3.5), align=None)
    extrude(amount=-CUT_EXTRUDE21_DEPTH, mode=Mode.SUBTRACT)

    # Sketch47 → Cut-Extrude22 (cut)
    with BuildSketch(Plane.XZ.offset(-27.5)):
        with Locations((10.2, 22.925)):
            Rectangle(SKETCH47_W, SKETCH47_H)
        with Locations((35.2, 22.925)):
            Rectangle(SKETCH47_W, SKETCH47_H)
    extrude(amount=-CUT_EXTRUDE22_DEPTH, mode=Mode.SUBTRACT)

    # Fillet11
    fillet11_edges = [part.edges().sort_by_distance(p)[0] for p in [
        (10.2, 27.5, 15),
        (35.2, 27.5, 15),
        (39.7, 27.5, 22.925),
        (5.7, 27.5, 22.925),
    ]]
    fillet(fillet11_edges, radius=FILLET11_R - 0.0001)  # a hair under: the kernel refuses the full size

    # Chamfer7
    # the kernel refuses this chamfer: 1 mm, written as the material it takes off along each edge
    with BuildSketch(Plane(origin=(14.121682988, 2, 15.85), x_dir=(0, 0, 1), z_dir=(-1, 0, 0))) as chamfer7_piece_1_section:
        Polygon((CHAMFER7_SIZE, 0), (0, -CHAMFER7_SIZE), (0, 0), align=None)
    chamfer7_piece_1 = extrude(amount=7.044595236, mode=Mode.PRIVATE)
    chamfer7_piece_1 = chamfer7_piece_1 & Plane(origin=(12.7, 3.5, 15.85), x_dir=(-1, 0, 0), z_dir=(0, 0, 1)) * Cylinder(3.4, 19, mode=Mode.PRIVATE)
    add(chamfer7_piece_1, mode=Mode.SUBTRACT)
    with BuildSketch(Plane(origin=(38.322912248, 2, 15.85), x_dir=(0, 0, 1), z_dir=(-1, 0, 0))) as chamfer7_piece_2_section:
        Polygon((CHAMFER7_SIZE, 0), (0, -CHAMFER7_SIZE), (0, 0), align=None)
    chamfer7_piece_2 = extrude(amount=7.044595236, mode=Mode.PRIVATE)
    chamfer7_piece_2 = chamfer7_piece_2 & Plane(origin=(32.7, 3.5, 15.85), x_dir=(-1, 0, 0), z_dir=(0, 0, 1)) * Cylinder(3.4, 19, mode=Mode.PRIVATE)
    add(chamfer7_piece_2, mode=Mode.SUBTRACT)
    with BuildSketch(Plane(origin=(33.934385989, 2, 18.85), x_dir=(0, 0, -1), z_dir=(1, 0, 0))) as chamfer7_piece_3_section:
        Polygon((CHAMFER7_SIZE, 0), (0, -CHAMFER7_SIZE), (0, 0), align=None)
    chamfer7_piece_3 = extrude(amount=9.531228022, mode=Mode.PRIVATE)
    chamfer7_piece_3 = split(chamfer7_piece_3, bisect_by=Plane(origin=(35.86314823, 3.113571399, 18.85), z_dir=(0.8660254037844388, 0.4999999999999997, 0)), keep=Keep.TOP, mode=Mode.PRIVATE)
    chamfer7_piece_3 = split(chamfer7_piece_3, bisect_by=Plane(origin=(39.154044764, -1.013571399, 18.85), z_dir=(-0.8660254037844384, 0.5000000000000007, 0)), keep=Keep.TOP, mode=Mode.PRIVATE)
    chamfer7_piece_3 = split(chamfer7_piece_3, bisect_by=Plane(origin=(33.934385989, 1.1, 18.85), z_dir=(0, 1, 0)), keep=Keep.TOP, mode=Mode.PRIVATE)
    add(chamfer7_piece_3, mode=Mode.SUBTRACT)
    with BuildSketch(Plane(origin=(1.934385989, 2, 18.85), x_dir=(0, 0, -1), z_dir=(1, 0, 0))) as chamfer7_piece_4_section:
        Polygon((CHAMFER7_SIZE, 0), (0, -CHAMFER7_SIZE), (0, 0), align=None)
    chamfer7_piece_4 = extrude(amount=9.531228022, mode=Mode.PRIVATE)
    chamfer7_piece_4 = split(chamfer7_piece_4, bisect_by=Plane(origin=(3.86314823, 3.113571399, 18.85), z_dir=(0.8660254037844382, 0.5000000000000009, 0)), keep=Keep.TOP, mode=Mode.PRIVATE)
    chamfer7_piece_4 = split(chamfer7_piece_4, bisect_by=Plane(origin=(1.934385989, 1.1, 18.85), z_dir=(0, 1, 0)), keep=Keep.TOP, mode=Mode.PRIVATE)
    chamfer7_piece_4 = split(chamfer7_piece_4, bisect_by=Plane(origin=(7.154044764, -1.013571399, 18.85), z_dir=(-0.8660254037844392, 0.49999999999999906, 0)), keep=Keep.TOP, mode=Mode.PRIVATE)
    add(chamfer7_piece_4, mode=Mode.SUBTRACT)


solid = part.part
